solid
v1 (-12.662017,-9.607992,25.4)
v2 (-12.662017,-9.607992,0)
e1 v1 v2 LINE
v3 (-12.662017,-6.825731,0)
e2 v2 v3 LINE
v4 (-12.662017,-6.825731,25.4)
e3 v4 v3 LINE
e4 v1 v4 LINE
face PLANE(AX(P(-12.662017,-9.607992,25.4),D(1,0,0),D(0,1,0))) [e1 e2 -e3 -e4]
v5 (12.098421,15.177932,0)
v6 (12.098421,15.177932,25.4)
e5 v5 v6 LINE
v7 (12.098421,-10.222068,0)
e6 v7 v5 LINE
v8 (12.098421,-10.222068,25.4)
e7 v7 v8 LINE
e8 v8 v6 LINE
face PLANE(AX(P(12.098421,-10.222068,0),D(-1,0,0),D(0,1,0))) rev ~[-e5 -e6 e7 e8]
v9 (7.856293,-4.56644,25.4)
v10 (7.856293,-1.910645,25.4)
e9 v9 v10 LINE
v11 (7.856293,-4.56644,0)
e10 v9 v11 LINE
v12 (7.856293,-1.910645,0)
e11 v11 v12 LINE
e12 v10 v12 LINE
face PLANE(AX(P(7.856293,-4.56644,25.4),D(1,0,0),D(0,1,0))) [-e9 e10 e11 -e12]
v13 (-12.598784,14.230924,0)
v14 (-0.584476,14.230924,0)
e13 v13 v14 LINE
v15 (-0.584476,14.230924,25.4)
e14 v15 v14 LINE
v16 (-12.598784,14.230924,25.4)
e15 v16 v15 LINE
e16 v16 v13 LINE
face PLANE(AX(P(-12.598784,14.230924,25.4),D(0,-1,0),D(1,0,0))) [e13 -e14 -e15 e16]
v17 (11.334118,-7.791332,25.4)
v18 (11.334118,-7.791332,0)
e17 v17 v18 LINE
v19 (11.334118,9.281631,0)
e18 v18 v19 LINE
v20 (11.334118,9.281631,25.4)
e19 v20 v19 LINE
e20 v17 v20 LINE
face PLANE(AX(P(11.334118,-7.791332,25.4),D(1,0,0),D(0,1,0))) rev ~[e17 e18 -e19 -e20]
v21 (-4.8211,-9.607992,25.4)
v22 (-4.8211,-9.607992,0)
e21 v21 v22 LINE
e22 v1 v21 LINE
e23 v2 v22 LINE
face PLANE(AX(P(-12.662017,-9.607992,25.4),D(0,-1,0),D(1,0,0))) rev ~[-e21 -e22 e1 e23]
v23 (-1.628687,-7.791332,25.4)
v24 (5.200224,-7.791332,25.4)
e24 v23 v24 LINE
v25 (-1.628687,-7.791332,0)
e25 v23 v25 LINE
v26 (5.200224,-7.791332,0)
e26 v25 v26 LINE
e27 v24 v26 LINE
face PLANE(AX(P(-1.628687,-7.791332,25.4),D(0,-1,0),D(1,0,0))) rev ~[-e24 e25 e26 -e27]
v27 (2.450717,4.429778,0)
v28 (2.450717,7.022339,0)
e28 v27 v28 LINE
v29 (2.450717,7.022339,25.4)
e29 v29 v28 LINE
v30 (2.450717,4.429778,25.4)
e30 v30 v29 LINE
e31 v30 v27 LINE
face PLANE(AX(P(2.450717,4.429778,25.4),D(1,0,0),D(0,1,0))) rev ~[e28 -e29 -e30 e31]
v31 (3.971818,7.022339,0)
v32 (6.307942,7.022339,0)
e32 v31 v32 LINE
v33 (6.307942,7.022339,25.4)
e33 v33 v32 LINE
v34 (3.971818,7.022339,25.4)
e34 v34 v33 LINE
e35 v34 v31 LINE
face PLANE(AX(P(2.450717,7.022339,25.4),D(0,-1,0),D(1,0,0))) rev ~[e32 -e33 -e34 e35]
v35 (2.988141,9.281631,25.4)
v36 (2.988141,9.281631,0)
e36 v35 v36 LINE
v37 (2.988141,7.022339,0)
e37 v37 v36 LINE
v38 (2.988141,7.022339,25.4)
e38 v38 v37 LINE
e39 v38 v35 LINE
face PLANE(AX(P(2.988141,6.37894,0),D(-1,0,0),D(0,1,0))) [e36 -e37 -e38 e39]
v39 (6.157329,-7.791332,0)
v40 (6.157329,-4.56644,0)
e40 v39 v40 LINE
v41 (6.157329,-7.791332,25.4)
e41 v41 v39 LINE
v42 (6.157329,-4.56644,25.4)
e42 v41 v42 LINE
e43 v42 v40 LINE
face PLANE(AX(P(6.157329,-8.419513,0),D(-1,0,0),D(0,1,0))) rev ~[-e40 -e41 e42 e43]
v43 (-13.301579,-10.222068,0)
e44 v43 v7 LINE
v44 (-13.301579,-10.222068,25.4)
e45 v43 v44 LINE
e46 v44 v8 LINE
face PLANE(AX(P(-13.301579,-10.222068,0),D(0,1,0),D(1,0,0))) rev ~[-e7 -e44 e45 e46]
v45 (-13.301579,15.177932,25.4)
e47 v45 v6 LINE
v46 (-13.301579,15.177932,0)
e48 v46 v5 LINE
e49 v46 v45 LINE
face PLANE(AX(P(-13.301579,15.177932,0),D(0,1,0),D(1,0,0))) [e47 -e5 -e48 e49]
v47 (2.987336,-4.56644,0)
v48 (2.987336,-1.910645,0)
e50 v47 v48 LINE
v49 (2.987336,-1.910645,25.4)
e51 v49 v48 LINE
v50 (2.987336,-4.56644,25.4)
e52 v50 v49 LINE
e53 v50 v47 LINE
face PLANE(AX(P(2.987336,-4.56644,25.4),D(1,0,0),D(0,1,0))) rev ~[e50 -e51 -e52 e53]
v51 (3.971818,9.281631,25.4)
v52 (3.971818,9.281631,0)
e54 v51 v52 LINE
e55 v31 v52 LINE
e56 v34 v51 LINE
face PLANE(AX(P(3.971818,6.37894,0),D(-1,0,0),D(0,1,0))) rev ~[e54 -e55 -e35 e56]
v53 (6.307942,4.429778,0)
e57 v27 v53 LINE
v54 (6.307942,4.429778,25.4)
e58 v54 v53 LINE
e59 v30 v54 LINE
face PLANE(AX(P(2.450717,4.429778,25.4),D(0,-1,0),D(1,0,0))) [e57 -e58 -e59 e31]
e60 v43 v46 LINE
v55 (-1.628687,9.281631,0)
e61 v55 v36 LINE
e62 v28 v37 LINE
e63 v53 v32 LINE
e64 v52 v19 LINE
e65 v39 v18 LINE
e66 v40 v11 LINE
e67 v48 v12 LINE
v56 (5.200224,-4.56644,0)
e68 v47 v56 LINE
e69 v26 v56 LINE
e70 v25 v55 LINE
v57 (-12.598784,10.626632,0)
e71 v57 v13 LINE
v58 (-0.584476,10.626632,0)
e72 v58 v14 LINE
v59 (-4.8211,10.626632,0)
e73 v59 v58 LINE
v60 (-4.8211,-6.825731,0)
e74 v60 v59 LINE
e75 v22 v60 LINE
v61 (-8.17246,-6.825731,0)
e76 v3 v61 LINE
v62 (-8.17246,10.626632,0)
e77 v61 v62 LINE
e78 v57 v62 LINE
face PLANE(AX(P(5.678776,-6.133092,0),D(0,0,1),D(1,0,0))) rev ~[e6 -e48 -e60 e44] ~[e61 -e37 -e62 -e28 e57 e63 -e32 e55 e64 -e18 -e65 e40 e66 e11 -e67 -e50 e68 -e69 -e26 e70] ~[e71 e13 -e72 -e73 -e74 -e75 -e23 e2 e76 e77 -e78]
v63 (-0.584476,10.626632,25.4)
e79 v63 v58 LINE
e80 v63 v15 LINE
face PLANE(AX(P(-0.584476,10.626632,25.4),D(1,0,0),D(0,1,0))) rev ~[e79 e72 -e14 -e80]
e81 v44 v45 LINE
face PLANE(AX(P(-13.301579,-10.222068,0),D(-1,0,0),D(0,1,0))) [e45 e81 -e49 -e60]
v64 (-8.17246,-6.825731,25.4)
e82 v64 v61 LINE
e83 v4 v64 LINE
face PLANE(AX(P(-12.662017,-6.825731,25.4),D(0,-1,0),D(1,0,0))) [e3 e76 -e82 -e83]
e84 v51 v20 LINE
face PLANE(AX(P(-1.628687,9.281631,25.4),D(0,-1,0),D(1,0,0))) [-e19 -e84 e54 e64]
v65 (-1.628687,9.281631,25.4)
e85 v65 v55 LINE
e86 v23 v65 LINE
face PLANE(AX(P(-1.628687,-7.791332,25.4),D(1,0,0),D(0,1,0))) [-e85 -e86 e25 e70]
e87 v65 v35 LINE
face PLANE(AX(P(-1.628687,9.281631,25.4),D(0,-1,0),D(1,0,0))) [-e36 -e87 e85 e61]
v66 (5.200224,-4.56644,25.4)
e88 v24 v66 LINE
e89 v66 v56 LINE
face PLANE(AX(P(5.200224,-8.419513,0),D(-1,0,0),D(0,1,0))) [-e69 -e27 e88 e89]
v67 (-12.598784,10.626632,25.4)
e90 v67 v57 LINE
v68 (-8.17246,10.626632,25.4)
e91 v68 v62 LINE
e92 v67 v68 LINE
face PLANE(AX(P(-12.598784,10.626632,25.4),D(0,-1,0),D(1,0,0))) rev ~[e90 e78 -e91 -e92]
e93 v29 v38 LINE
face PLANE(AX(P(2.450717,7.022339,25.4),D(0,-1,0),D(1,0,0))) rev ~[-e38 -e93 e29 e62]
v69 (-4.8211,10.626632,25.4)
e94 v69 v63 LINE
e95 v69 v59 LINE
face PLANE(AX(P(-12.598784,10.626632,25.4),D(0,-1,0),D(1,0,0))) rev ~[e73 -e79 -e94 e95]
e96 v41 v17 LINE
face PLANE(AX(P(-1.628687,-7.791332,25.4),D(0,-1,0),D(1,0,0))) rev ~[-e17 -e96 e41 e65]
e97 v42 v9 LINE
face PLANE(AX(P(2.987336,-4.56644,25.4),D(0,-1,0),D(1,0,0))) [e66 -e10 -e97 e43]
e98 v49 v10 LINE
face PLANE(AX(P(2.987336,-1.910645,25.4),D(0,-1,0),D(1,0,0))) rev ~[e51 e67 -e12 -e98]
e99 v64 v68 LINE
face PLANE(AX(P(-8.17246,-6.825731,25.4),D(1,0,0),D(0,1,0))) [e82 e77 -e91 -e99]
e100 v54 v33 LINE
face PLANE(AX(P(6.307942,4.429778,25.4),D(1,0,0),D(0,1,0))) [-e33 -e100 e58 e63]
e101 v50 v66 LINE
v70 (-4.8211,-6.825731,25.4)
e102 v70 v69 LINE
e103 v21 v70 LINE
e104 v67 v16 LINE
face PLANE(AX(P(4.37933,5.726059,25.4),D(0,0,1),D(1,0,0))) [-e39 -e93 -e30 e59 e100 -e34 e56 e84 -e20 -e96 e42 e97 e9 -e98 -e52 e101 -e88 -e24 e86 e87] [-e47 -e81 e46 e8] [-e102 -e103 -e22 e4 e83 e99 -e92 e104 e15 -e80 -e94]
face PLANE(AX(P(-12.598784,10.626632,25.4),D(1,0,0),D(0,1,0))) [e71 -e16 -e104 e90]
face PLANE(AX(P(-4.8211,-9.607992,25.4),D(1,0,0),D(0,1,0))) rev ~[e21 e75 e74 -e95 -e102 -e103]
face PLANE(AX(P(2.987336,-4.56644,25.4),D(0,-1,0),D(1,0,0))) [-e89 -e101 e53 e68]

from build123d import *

# Parameters (mm, degrees)
F0_W      = 25.4
F0_H      = 25.4
F1_DEPTH  = 25.4
F2_W      = 12.0143074892
F2_H      = 3.6042919382
F3_DEPTH  = 25.401
F4_W      = 3.3513596281
F4_H      = 17.4523624592
F5_DEPTH  = 25.401
F6_W      = 7.8409165144
F6_H      = 2.7822614647
F7_DEPTH  = 25.401
F10_W     = 12.962804758
F10_H     = 17.0729630627
F11_DEPTH = 25.401
F8_W      = 3.857224714
F8_H      = 2.5925613008
F12_DEPTH = 25.4
F9_W      = 4.8689562827
F9_H      = 2.6557944948
F13_DEPTH = 25.4
F15_W     = 0.9836773388
F15_H     = 3.4875846468
F16_DEPTH = 25.4
F17_W     = 0.9571057744
F17_H     = 4.5728415716
F18_DEPTH = 25.4


with BuildPart() as f1:
    # F0 (on Top) → F1 (new body)
    with BuildSketch(Plane.XY):
        with Locations((-0.6015789695, 2.4779321572)):
            Rectangle(F0_W, F0_H)
    extrude(amount=F1_DEPTH)

    # F2 (on face) → F3 (cut, through all)
    with BuildSketch(Plane.XY.offset(25.4)):
        with Locations((-6.5916299645, 12.428777758)):
            Rectangle(F2_W, F2_H)
    extrude(amount=-F3_DEPTH, mode=Mode.SUBTRACT)

    # F4 (on face) → F5 (cut, through all)
    with BuildSketch(Plane.XY.offset(25.4)):
        with Locations((-6.4967800863, 1.9004505593)):
            Rectangle(F4_W, F4_H)
    extrude(amount=-F5_DEPTH, mode=Mode.SUBTRACT)

    # F6 (on face) → F7 (cut, through all)
    with BuildSketch(Plane.XY.offset(25.4)):
        with Locations((-8.7415585294, -8.2168614026)):
            Rectangle(F6_W, F6_H)
    extrude(amount=-F7_DEPTH, mode=Mode.SUBTRACT)

    # F10 (on face) → F11 (cut, through all)
    with BuildSketch(Plane.XY.offset(25.4)):
        with Locations((4.852715123, 0.7451490965)):
            Rectangle(F10_W, F10_H)
    extrude(amount=-F11_DEPTH, mode=Mode.SUBTRACT)



with BuildPart() as f12:
    # F8 (on face) → F12 (new body)
    with BuildSketch(Plane.XY.offset(25.4)):
        with Locations((4.3793295044, 5.7260587346)):
            Rectangle(F8_W, F8_H)
    extrude(amount=-F12_DEPTH)


with BuildPart() as f13:
    # F9 (on face) → F13 (new body)
    with BuildSketch(Plane.XY.offset(25.4)):
        with Locations((5.4218145087, -3.2385426457)):
            Rectangle(F9_W, F9_H)
    extrude(amount=-F13_DEPTH)


with BuildPart() as f1_1:
    add(f1.part)

    add(f12.part)  # F16 merges F12
    # F15 (on face) → F16 (join)
    with BuildSketch(Plane.XY):
        with Locations((3.4799792338, 8.1227321643)):
            Rectangle(F15_W, F15_H)
    extrude(amount=F16_DEPTH)


    add(f13.part)  # F18 merges F13
    # F17 (on face) → F18 (join)
    with BuildSketch(Plane.XY):
        with Locations((5.6787764188, -6.1330919852)):
            Rectangle(F17_W, F17_H)
    extrude(amount=F18_DEPTH)


solid = f1_1.part
